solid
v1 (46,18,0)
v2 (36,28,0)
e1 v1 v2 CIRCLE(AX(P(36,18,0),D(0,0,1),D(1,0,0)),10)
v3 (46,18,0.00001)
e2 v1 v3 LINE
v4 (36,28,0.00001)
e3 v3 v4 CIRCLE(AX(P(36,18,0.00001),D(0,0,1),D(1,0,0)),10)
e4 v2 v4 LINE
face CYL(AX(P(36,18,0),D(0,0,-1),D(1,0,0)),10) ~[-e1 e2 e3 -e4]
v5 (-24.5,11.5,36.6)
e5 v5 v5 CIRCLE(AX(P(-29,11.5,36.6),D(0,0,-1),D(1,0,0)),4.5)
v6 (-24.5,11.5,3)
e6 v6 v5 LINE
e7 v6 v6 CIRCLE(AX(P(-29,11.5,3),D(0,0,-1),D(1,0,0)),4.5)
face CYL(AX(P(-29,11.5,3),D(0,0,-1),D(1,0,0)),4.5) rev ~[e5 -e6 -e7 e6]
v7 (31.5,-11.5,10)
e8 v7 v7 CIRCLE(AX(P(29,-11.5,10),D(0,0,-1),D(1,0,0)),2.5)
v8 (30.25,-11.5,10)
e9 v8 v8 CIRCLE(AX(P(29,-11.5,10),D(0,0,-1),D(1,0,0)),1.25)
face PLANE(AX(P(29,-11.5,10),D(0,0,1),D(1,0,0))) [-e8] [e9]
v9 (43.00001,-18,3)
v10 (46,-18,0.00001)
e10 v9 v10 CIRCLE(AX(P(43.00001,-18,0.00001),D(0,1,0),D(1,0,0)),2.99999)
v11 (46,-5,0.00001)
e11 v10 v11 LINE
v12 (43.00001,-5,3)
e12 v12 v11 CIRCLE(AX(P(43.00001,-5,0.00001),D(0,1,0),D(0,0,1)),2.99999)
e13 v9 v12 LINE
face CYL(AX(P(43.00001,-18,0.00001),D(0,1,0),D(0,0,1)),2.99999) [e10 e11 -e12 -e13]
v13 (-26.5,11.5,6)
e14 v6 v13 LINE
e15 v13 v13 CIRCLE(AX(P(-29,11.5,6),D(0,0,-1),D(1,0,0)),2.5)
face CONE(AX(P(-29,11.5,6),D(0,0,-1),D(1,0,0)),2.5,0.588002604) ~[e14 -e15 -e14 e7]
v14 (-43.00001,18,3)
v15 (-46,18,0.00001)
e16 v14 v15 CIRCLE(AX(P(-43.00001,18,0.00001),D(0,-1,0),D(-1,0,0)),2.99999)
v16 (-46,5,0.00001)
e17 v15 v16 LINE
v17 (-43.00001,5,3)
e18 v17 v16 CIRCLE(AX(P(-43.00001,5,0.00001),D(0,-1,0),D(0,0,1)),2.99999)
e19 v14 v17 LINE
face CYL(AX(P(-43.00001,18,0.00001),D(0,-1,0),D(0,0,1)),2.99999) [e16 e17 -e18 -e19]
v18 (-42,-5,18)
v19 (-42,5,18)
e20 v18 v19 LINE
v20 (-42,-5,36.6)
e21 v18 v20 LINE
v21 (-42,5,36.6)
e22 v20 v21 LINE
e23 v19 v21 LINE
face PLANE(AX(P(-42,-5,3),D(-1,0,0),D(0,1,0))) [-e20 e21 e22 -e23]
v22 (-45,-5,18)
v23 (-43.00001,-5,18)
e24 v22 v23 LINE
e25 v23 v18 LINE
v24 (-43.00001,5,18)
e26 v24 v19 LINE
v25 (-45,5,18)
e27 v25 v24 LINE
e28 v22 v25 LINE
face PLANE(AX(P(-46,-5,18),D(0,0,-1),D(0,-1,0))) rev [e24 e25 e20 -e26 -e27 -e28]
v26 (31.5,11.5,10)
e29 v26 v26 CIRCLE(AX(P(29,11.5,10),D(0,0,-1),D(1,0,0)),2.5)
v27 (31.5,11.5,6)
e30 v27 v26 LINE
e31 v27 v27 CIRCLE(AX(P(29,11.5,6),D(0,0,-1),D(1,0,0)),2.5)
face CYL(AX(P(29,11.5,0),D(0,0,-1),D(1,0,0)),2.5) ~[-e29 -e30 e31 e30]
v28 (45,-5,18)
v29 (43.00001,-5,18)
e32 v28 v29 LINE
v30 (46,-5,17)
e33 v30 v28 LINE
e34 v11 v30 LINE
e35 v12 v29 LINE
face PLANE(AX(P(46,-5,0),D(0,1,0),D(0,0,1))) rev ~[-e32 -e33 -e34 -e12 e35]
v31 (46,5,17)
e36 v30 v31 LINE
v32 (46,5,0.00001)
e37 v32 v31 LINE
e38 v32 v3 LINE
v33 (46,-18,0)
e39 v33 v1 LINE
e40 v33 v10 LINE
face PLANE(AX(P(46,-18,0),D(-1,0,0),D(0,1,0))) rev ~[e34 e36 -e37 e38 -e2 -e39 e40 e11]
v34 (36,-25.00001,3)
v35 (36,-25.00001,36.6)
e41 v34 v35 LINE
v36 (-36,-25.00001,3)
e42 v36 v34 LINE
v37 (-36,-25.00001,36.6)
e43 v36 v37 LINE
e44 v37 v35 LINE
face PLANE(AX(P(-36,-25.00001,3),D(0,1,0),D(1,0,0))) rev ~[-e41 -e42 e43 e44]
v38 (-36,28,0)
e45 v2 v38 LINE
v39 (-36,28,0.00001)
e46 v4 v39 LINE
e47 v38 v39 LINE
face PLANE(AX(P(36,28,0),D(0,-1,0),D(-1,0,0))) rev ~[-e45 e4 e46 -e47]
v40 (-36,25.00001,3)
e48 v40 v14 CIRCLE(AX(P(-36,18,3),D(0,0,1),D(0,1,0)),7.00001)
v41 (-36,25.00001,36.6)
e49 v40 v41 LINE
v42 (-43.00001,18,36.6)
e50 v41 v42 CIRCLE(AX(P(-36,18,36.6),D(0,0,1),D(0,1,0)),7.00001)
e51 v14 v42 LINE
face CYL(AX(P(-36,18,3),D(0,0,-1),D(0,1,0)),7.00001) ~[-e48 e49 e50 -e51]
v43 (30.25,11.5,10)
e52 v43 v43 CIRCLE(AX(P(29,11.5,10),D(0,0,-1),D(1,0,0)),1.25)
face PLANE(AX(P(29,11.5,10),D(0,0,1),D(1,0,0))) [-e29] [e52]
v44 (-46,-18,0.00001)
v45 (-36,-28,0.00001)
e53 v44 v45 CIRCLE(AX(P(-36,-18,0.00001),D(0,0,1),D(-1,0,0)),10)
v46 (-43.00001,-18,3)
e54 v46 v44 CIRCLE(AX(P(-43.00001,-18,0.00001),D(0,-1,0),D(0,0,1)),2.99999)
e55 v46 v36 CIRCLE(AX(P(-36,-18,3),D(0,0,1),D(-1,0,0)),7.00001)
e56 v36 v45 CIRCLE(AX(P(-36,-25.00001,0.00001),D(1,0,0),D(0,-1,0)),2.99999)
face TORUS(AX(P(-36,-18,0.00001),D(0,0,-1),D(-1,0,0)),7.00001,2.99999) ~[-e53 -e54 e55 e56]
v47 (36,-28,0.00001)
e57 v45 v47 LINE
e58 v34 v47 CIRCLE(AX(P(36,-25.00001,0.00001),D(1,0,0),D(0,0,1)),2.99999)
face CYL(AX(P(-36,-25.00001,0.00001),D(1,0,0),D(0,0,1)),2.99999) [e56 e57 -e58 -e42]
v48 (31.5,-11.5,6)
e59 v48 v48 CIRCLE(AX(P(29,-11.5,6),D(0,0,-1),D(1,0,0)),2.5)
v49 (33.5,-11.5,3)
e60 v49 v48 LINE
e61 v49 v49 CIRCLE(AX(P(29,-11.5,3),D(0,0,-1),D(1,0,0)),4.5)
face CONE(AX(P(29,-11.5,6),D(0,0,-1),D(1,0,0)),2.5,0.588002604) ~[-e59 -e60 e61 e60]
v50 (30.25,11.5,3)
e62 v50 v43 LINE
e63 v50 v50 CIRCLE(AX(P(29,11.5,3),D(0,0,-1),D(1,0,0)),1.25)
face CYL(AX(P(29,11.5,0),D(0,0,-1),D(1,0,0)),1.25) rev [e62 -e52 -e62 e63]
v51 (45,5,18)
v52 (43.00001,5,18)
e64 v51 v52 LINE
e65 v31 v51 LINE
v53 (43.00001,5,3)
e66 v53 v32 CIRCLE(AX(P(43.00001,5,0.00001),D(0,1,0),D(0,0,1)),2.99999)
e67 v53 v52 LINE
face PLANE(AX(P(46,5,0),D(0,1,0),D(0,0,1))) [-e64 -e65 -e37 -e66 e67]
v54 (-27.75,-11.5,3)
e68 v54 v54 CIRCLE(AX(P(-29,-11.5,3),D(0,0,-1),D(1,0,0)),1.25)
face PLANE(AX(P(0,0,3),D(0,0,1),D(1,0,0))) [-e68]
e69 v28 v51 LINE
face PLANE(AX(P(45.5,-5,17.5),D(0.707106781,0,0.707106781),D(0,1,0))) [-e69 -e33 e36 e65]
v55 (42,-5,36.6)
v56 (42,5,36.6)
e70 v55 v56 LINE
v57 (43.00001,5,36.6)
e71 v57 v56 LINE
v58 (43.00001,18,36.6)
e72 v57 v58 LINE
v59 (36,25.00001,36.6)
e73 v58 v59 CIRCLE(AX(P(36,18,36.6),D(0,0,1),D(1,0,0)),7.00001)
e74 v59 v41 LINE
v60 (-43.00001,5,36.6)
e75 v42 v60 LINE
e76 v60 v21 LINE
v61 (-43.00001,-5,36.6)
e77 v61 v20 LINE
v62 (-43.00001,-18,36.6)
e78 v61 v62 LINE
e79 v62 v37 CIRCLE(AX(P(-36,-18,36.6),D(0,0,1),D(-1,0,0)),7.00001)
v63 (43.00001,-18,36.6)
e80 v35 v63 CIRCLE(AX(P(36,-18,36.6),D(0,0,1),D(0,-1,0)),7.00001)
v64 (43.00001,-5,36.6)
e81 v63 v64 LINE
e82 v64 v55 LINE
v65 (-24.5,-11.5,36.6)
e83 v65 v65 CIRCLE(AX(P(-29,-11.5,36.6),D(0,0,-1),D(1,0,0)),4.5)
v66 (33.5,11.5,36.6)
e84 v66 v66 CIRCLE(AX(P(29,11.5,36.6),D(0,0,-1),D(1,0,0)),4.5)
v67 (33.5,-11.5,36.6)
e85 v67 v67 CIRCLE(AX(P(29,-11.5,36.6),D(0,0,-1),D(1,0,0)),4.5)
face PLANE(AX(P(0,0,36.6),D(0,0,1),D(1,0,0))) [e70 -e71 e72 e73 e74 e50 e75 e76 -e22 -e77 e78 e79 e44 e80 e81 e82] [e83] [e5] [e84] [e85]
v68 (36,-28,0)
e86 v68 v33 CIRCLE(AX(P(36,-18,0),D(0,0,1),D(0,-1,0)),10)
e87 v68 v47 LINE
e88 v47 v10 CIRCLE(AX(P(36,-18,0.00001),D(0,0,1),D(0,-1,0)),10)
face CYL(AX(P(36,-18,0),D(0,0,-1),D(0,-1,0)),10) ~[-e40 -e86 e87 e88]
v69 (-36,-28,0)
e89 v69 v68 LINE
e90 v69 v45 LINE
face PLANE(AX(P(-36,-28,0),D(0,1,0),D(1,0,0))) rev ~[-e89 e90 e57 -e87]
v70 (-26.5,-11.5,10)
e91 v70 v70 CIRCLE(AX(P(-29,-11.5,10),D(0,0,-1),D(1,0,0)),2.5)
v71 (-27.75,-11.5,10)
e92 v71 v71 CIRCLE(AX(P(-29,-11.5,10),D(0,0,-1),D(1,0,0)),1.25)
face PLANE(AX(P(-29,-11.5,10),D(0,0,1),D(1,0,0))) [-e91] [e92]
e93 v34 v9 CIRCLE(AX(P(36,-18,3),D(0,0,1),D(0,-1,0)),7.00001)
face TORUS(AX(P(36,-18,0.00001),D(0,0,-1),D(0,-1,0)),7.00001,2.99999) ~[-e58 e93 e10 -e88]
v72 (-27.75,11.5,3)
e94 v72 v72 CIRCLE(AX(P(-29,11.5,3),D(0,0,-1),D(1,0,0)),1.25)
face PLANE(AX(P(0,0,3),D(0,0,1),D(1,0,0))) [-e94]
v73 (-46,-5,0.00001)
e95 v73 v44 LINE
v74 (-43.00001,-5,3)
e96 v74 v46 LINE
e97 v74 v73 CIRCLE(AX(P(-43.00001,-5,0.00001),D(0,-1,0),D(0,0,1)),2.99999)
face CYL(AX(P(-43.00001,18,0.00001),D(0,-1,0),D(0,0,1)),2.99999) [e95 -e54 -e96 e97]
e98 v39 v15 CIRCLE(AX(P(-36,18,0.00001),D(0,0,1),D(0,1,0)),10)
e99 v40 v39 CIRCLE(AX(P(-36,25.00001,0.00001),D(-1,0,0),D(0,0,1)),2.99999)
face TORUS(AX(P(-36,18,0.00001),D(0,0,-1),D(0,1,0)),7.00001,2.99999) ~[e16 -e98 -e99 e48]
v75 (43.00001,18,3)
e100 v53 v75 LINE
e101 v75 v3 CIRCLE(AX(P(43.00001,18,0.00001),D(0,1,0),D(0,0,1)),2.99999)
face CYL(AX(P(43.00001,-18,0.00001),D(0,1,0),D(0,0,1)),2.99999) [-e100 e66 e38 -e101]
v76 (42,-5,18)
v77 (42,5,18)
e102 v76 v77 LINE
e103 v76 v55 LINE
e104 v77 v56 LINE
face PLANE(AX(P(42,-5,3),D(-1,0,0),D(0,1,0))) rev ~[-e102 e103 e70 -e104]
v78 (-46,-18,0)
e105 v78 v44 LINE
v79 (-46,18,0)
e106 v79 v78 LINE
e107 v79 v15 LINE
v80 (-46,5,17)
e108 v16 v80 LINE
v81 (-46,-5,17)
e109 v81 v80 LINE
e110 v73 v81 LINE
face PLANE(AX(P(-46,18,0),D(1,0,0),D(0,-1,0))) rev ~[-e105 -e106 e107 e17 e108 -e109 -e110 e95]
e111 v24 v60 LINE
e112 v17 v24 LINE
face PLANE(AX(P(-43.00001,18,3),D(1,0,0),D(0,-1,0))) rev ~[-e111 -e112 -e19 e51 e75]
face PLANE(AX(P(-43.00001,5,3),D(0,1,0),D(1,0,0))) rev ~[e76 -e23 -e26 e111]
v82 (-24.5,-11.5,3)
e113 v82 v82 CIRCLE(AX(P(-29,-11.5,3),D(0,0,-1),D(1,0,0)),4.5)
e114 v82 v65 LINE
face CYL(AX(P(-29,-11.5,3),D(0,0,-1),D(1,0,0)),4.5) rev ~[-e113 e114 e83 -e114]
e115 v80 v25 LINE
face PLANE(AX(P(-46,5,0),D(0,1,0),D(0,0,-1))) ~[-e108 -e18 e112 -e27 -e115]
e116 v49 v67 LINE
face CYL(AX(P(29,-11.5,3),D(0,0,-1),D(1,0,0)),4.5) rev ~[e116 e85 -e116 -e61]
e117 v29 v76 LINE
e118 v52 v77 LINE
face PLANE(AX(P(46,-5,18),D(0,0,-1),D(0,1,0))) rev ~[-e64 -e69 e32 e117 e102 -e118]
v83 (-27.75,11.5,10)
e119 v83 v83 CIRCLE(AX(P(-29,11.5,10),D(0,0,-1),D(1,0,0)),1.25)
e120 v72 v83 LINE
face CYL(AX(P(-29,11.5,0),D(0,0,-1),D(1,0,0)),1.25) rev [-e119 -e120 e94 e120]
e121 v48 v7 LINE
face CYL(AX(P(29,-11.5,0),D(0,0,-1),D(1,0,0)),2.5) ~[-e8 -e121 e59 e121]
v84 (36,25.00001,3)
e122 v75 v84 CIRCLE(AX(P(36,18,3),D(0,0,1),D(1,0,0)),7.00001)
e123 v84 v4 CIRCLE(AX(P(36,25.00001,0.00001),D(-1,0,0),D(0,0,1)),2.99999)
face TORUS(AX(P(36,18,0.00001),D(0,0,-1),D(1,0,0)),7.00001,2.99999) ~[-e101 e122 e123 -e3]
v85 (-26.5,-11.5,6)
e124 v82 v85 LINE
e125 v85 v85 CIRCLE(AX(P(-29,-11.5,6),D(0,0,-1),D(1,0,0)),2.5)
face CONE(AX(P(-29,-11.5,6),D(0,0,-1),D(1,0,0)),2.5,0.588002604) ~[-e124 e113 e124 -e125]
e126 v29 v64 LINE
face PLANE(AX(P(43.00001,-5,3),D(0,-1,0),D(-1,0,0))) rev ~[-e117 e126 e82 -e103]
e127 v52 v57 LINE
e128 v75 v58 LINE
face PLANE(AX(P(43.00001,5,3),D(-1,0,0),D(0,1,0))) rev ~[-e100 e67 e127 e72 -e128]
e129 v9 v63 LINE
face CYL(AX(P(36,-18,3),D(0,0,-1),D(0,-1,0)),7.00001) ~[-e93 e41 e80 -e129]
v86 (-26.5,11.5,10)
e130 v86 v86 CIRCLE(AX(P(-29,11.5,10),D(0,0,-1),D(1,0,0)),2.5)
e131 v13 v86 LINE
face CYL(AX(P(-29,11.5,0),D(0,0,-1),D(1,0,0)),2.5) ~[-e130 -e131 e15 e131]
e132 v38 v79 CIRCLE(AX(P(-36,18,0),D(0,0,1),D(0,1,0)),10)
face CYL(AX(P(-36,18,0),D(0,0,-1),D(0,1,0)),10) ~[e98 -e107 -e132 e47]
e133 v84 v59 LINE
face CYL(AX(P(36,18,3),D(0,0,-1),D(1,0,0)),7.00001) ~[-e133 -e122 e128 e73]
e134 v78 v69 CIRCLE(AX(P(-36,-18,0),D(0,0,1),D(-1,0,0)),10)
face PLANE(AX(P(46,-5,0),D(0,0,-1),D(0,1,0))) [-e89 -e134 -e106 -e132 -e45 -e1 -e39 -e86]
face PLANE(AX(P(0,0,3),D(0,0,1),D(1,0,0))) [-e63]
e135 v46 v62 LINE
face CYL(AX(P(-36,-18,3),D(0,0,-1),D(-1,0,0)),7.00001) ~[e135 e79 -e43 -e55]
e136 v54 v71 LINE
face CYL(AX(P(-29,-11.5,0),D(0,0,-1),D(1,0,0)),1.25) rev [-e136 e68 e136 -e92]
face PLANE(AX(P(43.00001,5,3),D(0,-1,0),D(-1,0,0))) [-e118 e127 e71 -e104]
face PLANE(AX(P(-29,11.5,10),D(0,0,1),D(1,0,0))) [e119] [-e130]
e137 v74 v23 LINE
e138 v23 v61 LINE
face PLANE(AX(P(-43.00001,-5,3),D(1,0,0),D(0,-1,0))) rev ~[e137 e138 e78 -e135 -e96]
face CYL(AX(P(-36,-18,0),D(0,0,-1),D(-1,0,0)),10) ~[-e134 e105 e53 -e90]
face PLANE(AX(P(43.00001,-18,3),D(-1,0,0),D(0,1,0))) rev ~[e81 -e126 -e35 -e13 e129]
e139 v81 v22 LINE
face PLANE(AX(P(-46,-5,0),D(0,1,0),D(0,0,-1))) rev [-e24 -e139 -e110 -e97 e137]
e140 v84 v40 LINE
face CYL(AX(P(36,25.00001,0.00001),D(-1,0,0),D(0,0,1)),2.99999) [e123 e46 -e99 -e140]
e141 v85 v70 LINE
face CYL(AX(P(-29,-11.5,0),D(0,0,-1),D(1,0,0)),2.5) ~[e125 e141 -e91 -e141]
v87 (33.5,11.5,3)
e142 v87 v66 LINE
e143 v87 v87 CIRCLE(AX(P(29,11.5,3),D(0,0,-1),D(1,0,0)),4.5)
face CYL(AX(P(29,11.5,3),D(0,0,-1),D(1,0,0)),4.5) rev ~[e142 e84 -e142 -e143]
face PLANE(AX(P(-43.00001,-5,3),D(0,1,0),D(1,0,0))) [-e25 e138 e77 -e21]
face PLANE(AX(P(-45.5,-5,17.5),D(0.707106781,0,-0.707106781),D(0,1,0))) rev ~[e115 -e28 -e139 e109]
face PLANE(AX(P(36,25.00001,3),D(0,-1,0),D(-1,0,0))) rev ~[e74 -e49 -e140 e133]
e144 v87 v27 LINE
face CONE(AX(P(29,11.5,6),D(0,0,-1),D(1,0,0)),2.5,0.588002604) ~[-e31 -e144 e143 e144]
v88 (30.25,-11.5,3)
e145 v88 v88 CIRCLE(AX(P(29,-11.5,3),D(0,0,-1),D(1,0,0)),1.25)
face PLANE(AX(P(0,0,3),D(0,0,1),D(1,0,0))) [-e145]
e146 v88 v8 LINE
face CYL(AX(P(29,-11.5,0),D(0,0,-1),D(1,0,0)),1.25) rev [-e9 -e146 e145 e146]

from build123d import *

# Parameters (mm, degrees)
F2_DEPTH  = 3
F1_R      = 2.5
F1_R_2    = 1.25
F3_DEPTH  = 10
F4_SIZE2  = 3
F4_SIZE   = 2
F5_R      = 2.99999
F7_W      = 10
F7_H      = 18
F8_DEPTH  = 4
F10_SIZE  = 1
F11_DEPTH = 33.6


# Not quite as in the source:
# - a fillet or chamfer is up to 0.001 mm smaller than in the source, because OpenCascade refuses the exact size


with BuildPart() as f2:
    # F0 (on Top) → F2 (new body)
    with BuildSketch(Plane.XY):
        with BuildLine():
            ThreePointArc((46, 18), (43.0710678119, 25.0710678119), (36, 28))
            Line((36, 28), (-36, 28))
            ThreePointArc((-36, 28), (-43.0710678119, 25.0710678119), (-46, 18))
            Line((-46, 18), (-46, -18))
            ThreePointArc((-46, -18), (-43.0710678119, -25.0710678119), (-36, -28))
            Line((-36, -28), (36, -28))
            ThreePointArc((36, -28), (43.0710678119, -25.0710678119), (46, -18))
            Line((46, -18), (46, 18))
        make_face()
    extrude(amount=F2_DEPTH)

    # F1 (on Top) → F3 (join)
    with BuildSketch(Plane.XY):
        with Locations((-29, 11.5)):
            Circle(F1_R)
        with Locations((-29, 11.5)):
            Circle(F1_R_2, mode=Mode.SUBTRACT)
        with Locations((29, 11.5)):
            Circle(F1_R)
        with Locations((29, 11.5)):
            Circle(F1_R_2, mode=Mode.SUBTRACT)
        with Locations((-29, -11.5)):
            Circle(F1_R)
        with Locations((-29, -11.5)):
            Circle(F1_R_2, mode=Mode.SUBTRACT)
        with Locations((29, -11.5)):
            Circle(F1_R)
        with Locations((29, -11.5)):
            Circle(F1_R_2, mode=Mode.SUBTRACT)
    extrude(amount=F3_DEPTH)

    # F4
    f4_edges = [f2.edges().sort_by_distance(p)[0] for p in [
        (-31.5, 11.5, 3),
        (26.5, 11.5, 3),
        (26.5, -11.5, 3),
        (-31.5, -11.5, 3),
    ]]
    chamfer(f4_edges, length=F4_SIZE, length2=F4_SIZE2)

    # F5 (radius 3 in the source; OpenCascade refuses exactly that, so slightly less here)
    f5_edges = [f2.edges().sort_by_distance(p)[0] for p in [
        (0, 28, 3),
    ]]
    fillet(f5_edges, radius=F5_R)

    # F7 (on offset) → F8 (join)
    with BuildSketch(Plane.YZ.offset(46)):
        with Locations((0, 9)):
            Rectangle(F7_W, F7_H)
    extrude(amount=-F8_DEPTH)

    # F9: F2 across plane


with BuildPart() as f2_1:
    add(f2.part)
    add(f2.part.mirror(Plane.YZ))

    # F10
    f10_edges = [f2_1.edges().sort_by_distance(p)[0] for p in [
        (-46, 0, 18),
        (46, 0, 18),
    ]]
    chamfer(f10_edges, length=F10_SIZE)

    # F11 (add): a face of the model
    f11_faces = [f2_1.faces().sort_by_distance(p)[0] for p in [
        (0, 0, 3),
    ]]
    extrude(f11_faces, amount=F11_DEPTH)


solid = f2_1.part
